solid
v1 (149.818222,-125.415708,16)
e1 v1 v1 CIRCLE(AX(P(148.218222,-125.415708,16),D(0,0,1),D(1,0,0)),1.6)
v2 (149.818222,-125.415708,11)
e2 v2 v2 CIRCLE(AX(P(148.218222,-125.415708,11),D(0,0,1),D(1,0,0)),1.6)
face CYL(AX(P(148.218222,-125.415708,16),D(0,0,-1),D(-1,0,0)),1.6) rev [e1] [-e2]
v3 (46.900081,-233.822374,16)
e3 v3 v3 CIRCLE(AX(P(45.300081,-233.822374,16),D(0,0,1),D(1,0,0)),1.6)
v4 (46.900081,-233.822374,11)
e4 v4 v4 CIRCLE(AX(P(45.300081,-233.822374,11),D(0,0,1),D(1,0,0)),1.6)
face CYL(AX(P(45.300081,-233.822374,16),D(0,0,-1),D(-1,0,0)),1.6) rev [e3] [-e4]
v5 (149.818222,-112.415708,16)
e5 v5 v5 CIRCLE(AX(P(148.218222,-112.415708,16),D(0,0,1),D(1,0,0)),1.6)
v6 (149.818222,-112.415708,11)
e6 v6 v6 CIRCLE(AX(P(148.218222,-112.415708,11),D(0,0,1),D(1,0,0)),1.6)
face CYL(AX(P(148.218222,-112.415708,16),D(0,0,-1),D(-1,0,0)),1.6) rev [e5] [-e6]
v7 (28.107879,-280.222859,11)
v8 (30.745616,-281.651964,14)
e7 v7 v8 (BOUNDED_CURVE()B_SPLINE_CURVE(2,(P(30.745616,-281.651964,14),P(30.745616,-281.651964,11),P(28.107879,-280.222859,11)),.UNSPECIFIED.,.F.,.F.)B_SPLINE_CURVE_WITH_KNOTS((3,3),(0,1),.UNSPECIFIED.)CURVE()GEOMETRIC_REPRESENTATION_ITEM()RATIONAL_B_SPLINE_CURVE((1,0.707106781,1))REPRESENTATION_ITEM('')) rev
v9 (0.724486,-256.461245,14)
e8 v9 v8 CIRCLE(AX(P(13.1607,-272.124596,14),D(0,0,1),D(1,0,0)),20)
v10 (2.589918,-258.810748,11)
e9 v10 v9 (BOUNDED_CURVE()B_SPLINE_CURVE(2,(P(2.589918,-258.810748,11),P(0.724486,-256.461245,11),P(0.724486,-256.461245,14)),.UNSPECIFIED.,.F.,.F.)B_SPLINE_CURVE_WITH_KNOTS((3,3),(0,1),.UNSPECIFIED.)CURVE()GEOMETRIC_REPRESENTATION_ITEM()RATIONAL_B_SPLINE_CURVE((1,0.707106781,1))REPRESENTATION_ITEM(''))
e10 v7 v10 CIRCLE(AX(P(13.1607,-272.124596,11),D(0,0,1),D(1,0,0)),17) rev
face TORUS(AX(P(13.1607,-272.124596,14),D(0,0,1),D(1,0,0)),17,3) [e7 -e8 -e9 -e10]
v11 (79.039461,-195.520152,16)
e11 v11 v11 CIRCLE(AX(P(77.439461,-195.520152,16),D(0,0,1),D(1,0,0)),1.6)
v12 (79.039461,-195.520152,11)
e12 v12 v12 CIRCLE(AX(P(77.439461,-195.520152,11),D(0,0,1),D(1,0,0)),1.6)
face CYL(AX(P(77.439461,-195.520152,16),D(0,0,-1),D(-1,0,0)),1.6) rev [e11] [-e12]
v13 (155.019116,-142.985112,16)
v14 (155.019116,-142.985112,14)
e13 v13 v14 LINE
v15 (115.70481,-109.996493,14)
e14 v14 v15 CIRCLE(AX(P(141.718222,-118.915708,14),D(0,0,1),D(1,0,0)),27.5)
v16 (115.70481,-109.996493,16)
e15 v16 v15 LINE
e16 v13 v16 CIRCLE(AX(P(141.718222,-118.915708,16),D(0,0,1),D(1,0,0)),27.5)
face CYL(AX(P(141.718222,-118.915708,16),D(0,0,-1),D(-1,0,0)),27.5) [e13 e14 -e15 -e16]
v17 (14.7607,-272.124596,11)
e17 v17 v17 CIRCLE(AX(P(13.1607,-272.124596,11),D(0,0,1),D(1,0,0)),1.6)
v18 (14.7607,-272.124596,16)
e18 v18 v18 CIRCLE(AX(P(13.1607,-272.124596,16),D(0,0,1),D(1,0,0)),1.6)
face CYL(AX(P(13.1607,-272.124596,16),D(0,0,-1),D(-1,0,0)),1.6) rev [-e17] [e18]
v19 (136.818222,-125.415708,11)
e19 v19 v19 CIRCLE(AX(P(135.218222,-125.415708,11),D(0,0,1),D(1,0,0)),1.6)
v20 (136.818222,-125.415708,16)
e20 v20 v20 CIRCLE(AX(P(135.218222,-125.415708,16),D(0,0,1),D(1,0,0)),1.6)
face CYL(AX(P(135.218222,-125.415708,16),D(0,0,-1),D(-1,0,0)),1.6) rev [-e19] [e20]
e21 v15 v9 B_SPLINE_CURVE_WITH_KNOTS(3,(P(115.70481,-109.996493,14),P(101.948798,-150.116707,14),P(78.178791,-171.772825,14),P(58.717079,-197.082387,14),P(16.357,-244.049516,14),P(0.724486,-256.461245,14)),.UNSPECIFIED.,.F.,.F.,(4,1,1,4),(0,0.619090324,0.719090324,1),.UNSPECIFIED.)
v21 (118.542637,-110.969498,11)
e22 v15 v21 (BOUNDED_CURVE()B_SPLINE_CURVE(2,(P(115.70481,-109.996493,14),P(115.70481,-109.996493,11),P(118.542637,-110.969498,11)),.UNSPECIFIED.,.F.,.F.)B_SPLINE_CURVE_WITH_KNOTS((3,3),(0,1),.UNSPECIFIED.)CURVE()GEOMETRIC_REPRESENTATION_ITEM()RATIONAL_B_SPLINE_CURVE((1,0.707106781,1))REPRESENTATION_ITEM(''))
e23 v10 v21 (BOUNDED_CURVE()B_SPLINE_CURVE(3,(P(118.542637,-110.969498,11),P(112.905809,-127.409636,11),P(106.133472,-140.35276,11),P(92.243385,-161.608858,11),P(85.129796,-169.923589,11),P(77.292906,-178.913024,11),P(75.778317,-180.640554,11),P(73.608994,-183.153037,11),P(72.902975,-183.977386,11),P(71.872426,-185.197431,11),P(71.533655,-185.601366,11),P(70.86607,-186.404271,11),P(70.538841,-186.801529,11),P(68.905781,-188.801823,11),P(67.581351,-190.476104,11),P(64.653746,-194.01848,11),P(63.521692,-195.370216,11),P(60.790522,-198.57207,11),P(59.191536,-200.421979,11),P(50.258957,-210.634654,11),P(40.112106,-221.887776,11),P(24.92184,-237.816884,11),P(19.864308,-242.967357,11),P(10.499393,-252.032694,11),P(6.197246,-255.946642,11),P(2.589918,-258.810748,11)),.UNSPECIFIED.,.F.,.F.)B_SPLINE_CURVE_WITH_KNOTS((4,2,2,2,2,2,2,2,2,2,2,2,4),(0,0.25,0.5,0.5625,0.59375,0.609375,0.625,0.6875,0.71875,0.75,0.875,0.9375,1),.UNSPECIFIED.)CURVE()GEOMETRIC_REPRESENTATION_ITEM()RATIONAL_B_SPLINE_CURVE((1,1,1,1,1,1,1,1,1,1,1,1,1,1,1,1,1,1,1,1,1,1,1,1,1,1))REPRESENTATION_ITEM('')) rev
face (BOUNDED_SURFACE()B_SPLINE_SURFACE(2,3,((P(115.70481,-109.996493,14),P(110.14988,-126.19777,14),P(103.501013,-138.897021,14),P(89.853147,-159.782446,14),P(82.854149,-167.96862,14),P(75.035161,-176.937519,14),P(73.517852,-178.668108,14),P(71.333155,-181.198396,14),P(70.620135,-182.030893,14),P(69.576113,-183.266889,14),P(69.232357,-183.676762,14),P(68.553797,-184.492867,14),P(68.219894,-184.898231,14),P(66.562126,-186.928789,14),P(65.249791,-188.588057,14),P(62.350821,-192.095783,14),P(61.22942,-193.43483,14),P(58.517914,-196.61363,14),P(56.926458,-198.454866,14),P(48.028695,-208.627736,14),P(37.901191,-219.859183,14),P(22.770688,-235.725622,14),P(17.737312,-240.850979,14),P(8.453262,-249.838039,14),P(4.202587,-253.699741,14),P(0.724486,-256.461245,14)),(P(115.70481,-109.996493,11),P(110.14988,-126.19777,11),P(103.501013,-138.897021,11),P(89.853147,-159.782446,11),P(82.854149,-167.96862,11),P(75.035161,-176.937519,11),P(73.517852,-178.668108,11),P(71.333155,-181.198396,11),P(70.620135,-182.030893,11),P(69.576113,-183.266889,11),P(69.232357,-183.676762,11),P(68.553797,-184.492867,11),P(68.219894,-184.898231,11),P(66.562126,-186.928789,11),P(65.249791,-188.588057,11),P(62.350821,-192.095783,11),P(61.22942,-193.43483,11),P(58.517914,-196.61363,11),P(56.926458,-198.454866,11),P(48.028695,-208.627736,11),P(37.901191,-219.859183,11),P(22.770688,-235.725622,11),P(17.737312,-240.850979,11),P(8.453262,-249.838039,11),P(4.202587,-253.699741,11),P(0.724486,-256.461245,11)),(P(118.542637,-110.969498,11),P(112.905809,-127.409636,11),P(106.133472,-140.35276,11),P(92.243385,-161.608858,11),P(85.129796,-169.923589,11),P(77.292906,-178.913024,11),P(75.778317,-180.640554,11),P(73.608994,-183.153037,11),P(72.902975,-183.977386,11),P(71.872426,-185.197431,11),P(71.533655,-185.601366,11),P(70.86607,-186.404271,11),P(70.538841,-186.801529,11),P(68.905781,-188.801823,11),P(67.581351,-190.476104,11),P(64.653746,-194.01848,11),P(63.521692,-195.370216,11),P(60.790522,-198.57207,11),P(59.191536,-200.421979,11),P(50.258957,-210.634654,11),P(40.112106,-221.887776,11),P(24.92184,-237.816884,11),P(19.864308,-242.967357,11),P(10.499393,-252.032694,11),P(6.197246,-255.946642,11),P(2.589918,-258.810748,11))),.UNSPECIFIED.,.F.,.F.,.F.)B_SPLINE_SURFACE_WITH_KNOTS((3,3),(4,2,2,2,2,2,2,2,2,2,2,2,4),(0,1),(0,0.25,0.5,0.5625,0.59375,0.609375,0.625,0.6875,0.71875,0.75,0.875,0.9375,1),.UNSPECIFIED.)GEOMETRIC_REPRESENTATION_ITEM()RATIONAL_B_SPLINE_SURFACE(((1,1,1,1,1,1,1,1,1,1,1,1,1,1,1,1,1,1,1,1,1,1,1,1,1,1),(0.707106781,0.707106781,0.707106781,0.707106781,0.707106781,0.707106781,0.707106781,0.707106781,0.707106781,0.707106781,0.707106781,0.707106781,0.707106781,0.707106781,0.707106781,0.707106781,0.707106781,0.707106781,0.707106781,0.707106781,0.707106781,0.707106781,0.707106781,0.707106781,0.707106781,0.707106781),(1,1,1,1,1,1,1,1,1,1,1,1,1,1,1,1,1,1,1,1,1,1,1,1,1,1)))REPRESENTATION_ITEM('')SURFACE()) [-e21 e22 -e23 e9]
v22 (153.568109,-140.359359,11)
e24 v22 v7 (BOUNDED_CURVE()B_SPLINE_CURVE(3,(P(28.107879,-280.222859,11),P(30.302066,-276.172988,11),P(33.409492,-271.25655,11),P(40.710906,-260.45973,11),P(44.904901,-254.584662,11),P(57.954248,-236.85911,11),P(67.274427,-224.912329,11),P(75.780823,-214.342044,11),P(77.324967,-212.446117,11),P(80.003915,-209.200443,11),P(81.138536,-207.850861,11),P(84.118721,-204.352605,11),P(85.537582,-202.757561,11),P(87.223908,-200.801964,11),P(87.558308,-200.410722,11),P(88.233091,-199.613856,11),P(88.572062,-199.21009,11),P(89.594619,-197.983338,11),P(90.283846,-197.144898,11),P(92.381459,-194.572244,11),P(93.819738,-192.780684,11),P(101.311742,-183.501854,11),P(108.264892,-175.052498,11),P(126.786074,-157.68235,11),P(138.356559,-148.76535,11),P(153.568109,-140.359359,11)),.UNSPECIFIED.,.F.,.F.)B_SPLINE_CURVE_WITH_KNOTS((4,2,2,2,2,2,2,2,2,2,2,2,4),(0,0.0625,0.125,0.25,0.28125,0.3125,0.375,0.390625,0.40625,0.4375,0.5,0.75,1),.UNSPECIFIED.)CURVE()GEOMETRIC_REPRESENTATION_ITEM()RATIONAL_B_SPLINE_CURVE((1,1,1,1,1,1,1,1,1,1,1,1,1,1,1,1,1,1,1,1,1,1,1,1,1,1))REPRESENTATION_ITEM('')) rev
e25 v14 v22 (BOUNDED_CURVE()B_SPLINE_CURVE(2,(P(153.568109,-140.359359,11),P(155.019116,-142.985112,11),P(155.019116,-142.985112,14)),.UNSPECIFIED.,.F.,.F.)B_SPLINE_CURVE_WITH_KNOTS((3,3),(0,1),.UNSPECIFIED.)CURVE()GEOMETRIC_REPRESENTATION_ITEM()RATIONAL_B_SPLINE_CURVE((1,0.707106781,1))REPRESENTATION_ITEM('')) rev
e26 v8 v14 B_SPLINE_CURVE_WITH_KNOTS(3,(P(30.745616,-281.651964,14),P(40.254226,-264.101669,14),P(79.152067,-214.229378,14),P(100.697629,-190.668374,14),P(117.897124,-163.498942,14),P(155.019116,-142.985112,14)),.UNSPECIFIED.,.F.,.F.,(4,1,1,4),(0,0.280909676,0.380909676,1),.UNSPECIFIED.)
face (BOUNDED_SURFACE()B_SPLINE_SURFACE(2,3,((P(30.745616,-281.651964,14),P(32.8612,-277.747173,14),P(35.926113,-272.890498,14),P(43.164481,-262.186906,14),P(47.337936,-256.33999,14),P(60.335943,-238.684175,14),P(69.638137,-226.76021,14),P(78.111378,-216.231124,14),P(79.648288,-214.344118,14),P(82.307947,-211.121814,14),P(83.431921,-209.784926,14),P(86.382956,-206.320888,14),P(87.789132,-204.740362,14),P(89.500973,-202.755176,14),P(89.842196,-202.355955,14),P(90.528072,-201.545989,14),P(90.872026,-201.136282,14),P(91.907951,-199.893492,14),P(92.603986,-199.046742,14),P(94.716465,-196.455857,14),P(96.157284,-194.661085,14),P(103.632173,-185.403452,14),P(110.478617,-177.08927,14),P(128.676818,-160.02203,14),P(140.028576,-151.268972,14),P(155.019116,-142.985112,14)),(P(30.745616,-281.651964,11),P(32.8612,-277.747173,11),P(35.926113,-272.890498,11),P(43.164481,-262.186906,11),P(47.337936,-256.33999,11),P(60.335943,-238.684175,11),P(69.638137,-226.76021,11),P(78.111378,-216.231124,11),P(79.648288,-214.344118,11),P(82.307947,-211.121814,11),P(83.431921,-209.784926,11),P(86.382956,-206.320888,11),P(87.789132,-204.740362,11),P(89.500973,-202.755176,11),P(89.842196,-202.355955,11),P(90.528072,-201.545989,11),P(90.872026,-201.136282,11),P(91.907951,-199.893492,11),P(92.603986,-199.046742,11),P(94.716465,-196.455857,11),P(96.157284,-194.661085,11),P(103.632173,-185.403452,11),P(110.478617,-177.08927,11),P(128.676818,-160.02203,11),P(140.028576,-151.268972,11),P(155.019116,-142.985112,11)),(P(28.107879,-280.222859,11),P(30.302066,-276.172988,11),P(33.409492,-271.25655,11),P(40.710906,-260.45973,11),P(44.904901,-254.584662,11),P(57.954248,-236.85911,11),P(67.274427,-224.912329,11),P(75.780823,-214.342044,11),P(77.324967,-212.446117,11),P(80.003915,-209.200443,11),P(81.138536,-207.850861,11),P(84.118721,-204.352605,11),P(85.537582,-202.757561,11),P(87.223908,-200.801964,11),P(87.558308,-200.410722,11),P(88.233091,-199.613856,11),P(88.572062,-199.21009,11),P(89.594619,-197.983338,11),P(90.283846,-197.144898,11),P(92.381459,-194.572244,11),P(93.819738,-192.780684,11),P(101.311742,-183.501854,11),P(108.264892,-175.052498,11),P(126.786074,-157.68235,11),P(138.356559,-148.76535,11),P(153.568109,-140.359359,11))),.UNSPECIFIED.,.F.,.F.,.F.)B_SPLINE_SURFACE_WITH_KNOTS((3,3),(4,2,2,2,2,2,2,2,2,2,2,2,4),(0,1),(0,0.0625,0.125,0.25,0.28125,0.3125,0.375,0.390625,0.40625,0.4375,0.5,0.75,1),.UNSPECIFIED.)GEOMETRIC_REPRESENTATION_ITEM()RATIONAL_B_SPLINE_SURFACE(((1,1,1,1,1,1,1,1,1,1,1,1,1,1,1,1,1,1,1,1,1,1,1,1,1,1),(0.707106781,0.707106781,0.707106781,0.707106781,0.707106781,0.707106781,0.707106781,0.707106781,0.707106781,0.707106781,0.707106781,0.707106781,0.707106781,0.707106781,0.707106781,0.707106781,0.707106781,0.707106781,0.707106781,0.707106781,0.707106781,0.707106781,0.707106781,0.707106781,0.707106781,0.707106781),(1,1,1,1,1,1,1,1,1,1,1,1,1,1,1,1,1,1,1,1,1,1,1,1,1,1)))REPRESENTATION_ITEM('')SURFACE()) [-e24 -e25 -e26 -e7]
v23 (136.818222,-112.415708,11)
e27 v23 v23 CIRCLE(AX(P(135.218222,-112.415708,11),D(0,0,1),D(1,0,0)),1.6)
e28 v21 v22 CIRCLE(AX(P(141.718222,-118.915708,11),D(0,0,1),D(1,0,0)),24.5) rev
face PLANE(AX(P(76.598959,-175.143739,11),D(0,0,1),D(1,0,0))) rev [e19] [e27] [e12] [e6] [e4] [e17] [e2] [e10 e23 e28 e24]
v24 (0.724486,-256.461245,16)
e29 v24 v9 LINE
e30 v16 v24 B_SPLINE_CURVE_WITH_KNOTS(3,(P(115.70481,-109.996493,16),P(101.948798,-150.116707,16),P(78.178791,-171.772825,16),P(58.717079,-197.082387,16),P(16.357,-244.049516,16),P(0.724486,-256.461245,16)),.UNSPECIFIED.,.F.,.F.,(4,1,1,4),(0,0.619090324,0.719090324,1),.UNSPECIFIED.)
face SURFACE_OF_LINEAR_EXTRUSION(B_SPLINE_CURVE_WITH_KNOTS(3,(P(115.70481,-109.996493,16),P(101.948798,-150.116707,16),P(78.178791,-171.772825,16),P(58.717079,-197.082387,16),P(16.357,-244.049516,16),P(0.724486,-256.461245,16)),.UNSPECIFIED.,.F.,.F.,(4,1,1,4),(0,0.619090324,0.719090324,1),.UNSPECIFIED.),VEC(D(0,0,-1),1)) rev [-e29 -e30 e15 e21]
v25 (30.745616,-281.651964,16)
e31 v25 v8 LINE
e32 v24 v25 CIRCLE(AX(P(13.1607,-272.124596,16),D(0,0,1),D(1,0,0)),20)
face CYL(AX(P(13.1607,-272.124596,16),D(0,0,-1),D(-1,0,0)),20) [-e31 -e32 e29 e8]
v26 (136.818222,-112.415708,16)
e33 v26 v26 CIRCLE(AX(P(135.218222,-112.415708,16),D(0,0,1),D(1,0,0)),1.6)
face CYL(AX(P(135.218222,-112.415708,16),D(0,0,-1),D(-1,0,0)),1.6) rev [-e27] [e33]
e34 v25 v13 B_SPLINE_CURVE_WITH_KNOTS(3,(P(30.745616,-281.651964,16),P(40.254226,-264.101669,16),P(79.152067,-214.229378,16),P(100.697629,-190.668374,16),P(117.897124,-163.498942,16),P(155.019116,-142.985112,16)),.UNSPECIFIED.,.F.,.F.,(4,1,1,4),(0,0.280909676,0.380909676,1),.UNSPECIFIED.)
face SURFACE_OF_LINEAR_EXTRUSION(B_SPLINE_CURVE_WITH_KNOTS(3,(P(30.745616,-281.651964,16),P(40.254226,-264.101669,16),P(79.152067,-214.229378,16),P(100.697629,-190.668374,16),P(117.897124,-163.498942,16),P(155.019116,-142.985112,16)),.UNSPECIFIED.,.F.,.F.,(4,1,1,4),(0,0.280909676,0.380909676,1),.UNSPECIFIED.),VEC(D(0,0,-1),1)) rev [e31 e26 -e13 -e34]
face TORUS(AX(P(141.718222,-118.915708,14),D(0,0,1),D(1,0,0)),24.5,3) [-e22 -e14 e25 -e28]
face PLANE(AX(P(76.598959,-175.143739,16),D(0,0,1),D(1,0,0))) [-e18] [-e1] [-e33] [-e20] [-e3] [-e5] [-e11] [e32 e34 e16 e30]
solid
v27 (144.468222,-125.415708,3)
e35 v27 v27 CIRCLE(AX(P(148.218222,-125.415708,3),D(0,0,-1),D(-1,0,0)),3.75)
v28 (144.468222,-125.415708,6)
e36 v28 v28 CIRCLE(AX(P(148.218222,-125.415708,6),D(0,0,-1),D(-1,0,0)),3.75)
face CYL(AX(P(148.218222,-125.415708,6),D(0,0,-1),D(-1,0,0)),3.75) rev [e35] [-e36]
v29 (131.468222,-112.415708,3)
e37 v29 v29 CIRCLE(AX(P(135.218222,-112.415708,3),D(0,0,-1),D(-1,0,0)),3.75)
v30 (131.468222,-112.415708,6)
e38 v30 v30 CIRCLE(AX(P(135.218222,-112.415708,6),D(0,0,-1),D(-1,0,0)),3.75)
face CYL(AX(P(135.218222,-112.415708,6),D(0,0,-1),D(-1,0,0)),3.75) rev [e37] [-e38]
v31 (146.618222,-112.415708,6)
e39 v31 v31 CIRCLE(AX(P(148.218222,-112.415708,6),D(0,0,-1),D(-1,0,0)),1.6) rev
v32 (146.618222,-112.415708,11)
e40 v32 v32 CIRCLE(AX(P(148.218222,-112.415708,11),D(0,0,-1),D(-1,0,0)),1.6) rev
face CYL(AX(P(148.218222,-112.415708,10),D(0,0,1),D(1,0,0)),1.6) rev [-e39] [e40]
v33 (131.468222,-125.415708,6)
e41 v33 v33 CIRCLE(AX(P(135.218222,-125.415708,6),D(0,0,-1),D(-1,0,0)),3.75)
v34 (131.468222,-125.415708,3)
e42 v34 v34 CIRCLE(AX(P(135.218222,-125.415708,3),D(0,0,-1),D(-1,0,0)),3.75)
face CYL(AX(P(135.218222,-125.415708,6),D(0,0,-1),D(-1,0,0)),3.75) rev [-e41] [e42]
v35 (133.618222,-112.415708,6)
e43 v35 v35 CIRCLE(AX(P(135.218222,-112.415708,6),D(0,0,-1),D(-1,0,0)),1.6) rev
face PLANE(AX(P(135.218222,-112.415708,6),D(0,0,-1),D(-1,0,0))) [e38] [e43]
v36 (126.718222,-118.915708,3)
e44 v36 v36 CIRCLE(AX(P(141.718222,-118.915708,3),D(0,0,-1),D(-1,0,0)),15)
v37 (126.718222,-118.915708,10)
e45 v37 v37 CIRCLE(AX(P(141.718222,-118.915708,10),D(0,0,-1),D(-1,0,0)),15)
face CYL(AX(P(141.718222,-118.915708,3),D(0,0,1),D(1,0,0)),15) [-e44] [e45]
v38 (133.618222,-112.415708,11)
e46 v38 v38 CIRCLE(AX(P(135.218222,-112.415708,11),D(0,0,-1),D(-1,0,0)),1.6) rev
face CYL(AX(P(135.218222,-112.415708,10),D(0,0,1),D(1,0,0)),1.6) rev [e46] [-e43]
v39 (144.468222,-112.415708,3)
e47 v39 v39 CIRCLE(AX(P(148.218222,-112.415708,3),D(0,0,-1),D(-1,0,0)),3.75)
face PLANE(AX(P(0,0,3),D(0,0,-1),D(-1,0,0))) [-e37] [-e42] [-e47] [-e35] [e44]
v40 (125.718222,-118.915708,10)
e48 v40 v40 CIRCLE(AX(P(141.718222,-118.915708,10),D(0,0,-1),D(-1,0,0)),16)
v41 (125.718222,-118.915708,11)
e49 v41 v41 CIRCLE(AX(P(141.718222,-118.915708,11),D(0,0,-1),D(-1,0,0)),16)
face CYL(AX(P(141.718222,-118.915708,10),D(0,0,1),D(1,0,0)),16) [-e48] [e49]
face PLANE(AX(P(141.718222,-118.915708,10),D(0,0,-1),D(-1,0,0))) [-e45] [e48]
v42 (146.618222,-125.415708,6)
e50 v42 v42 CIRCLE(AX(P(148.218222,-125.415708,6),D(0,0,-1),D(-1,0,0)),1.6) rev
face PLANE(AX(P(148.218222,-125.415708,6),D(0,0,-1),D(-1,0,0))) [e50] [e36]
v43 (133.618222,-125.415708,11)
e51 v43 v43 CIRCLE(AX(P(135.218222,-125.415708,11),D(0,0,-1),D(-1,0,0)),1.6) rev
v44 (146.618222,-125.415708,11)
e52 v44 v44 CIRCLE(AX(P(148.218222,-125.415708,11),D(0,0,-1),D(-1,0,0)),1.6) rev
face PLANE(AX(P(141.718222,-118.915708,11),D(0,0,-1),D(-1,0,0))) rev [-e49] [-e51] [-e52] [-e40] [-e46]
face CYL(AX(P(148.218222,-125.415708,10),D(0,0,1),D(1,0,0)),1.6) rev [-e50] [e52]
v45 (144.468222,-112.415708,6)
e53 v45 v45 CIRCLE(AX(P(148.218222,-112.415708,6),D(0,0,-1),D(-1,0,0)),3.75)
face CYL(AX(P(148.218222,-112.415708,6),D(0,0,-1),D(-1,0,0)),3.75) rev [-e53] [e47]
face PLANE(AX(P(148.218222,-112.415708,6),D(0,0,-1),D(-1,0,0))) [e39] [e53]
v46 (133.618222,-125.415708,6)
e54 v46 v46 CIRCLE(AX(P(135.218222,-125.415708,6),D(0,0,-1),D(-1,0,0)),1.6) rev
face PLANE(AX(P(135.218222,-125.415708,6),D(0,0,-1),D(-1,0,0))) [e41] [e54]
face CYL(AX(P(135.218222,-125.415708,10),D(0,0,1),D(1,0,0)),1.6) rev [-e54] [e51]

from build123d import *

# Parameters (mm, degrees)
SKETCH1_R           = 1.6
BOSS_EXTRUDE1_DEPTH = 5
SKETCH2_R           = 16
SKETCH2_R_2         = 1.6
BOSS_EXTRUDE2_DEPTH = 1
BOSS_EXTRUDE3_START = 7
SKETCH3_R           = 15
SKETCH3_R_2         = 1.6
BOSS_EXTRUDE3_DEPTH = 7
SKETCH4_R           = 3.75
CUT_EXTRUDE1_DEPTH  = 3
VARFILLET2_R        = 3


with BuildPart() as part:
    # Sketch1 → Boss-Extrude1 (new body)
    with BuildSketch(Plane.XY.offset(11)):
        with BuildLine():
            ThreePointArc((155.019115612, -142.985112199), (159.394881243, -97.849485606), (115.704809966, -109.996492831))
            add(Edge.make_bspline(
                [(115.704809966, -109.996492831), (101.94879758, -150.116707379), (78.178790791, -171.772825461), (58.717079478, -197.082387325), (16.356999542, -244.049515564), (0.72448619, -256.46124476)],
                knots=[0, 0, 0, 0, 0.619090324, 0.719090324, 1, 1, 1, 1], degree=3))
            ThreePointArc((0.72448619, -256.46124476), (0.304947846, -287.445485278), (30.74561606, -281.651963762))
            add(Edge.make_bspline(
                [(155.019115612, -142.985112199), (117.897123756, -163.498941991), (100.69762913, -190.668374405), (79.152067085, -214.229377889), (40.254225745, -264.101669257), (30.74561606, -281.651963762)],
                knots=[0, 0, 0, 0, 0.619090324, 0.719090324, 1, 1, 1, 1], degree=3))
        make_face()
        with Locations((135.218221977, -112.415707792)):
            Circle(SKETCH1_R, mode=Mode.SUBTRACT)
        with Locations((148.218221977, -112.415707792)):
            Circle(SKETCH1_R, mode=Mode.SUBTRACT)
        with Locations((148.218221977, -125.415707792)):
            Circle(SKETCH1_R, mode=Mode.SUBTRACT)
        with Locations((135.218221977, -125.415707792)):
            Circle(SKETCH1_R, mode=Mode.SUBTRACT)
        with Locations((77.439461008, -195.520152104)):
            Circle(SKETCH1_R, mode=Mode.SUBTRACT)
        with Locations((45.300080524, -233.82237426)):
            Circle(SKETCH1_R, mode=Mode.SUBTRACT)
        with Locations((13.16070004, -272.124596416)):
            Circle(SKETCH1_R, mode=Mode.SUBTRACT)
    extrude(amount=BOSS_EXTRUDE1_DEPTH)

    # VarFillet2
    varfillet2_edges = [part.edges().sort_by_distance(p)[0] for p in [
        (65.360846316, -188.427744165, 11),
        (86.521548764, -206.183681785, 11),
    ]]
    fillet(varfillet2_edges, radius=VARFILLET2_R)


with BuildPart() as body_2:
    # Sketch2 → Boss-Extrude2 (new body)
    with BuildSketch(Plane(origin=(0, 0, 11), x_dir=(-1, 0, 0), z_dir=(0, 0, -1))):
        with Locations((-141.718221977, -118.915707792)):
            Circle(SKETCH2_R)
        with Locations((-148.218221977, -125.415707792)):
            Circle(SKETCH2_R_2, mode=Mode.SUBTRACT)
        with Locations((-135.218221977, -125.415707792)):
            Circle(SKETCH2_R_2, mode=Mode.SUBTRACT)
        with Locations((-148.218221977, -112.415707792)):
            Circle(SKETCH2_R_2, mode=Mode.SUBTRACT)
        with Locations((-135.218221977, -112.415707792)):
            Circle(SKETCH2_R_2, mode=Mode.SUBTRACT)
    extrude(amount=BOSS_EXTRUDE2_DEPTH)

    # Sketch3 → Boss-Extrude3 (add)
    with BuildSketch(Plane(origin=(0, 0, 10), x_dir=(-1, 0, 0), z_dir=(0, 0, -1)).offset(BOSS_EXTRUDE3_START)):
        with Locations((-141.718221977, -118.915707792)):
            Circle(SKETCH3_R)
        with Locations((-148.218221977, -125.415707792)):
            Circle(SKETCH3_R_2, mode=Mode.SUBTRACT)
        with Locations((-135.218221977, -125.415707792)):
            Circle(SKETCH3_R_2, mode=Mode.SUBTRACT)
        with Locations((-148.218221977, -112.415707792)):
            Circle(SKETCH3_R_2, mode=Mode.SUBTRACT)
        with Locations((-135.218221977, -112.415707792)):
            Circle(SKETCH3_R_2, mode=Mode.SUBTRACT)
    extrude(amount=-BOSS_EXTRUDE3_DEPTH)

    # Sketch4 → Cut-Extrude1 (cut)
    with BuildSketch(Plane(origin=(0, 0, 3), x_dir=(-1, 0, 0), z_dir=(0, 0, -1))):
        with Locations((-148.218221977, -112.415707792)):
            Circle(SKETCH4_R)
        with Locations((-135.218221977, -112.415707792)):
            Circle(SKETCH4_R)
        with Locations((-135.218221977, -125.415707792)):
            Circle(SKETCH4_R)
        with Locations((-148.218221977, -125.415707792)):
            Circle(SKETCH4_R)
    extrude(amount=-CUT_EXTRUDE1_DEPTH, mode=Mode.SUBTRACT)


solid = Compound([part.part, body_2.part])
